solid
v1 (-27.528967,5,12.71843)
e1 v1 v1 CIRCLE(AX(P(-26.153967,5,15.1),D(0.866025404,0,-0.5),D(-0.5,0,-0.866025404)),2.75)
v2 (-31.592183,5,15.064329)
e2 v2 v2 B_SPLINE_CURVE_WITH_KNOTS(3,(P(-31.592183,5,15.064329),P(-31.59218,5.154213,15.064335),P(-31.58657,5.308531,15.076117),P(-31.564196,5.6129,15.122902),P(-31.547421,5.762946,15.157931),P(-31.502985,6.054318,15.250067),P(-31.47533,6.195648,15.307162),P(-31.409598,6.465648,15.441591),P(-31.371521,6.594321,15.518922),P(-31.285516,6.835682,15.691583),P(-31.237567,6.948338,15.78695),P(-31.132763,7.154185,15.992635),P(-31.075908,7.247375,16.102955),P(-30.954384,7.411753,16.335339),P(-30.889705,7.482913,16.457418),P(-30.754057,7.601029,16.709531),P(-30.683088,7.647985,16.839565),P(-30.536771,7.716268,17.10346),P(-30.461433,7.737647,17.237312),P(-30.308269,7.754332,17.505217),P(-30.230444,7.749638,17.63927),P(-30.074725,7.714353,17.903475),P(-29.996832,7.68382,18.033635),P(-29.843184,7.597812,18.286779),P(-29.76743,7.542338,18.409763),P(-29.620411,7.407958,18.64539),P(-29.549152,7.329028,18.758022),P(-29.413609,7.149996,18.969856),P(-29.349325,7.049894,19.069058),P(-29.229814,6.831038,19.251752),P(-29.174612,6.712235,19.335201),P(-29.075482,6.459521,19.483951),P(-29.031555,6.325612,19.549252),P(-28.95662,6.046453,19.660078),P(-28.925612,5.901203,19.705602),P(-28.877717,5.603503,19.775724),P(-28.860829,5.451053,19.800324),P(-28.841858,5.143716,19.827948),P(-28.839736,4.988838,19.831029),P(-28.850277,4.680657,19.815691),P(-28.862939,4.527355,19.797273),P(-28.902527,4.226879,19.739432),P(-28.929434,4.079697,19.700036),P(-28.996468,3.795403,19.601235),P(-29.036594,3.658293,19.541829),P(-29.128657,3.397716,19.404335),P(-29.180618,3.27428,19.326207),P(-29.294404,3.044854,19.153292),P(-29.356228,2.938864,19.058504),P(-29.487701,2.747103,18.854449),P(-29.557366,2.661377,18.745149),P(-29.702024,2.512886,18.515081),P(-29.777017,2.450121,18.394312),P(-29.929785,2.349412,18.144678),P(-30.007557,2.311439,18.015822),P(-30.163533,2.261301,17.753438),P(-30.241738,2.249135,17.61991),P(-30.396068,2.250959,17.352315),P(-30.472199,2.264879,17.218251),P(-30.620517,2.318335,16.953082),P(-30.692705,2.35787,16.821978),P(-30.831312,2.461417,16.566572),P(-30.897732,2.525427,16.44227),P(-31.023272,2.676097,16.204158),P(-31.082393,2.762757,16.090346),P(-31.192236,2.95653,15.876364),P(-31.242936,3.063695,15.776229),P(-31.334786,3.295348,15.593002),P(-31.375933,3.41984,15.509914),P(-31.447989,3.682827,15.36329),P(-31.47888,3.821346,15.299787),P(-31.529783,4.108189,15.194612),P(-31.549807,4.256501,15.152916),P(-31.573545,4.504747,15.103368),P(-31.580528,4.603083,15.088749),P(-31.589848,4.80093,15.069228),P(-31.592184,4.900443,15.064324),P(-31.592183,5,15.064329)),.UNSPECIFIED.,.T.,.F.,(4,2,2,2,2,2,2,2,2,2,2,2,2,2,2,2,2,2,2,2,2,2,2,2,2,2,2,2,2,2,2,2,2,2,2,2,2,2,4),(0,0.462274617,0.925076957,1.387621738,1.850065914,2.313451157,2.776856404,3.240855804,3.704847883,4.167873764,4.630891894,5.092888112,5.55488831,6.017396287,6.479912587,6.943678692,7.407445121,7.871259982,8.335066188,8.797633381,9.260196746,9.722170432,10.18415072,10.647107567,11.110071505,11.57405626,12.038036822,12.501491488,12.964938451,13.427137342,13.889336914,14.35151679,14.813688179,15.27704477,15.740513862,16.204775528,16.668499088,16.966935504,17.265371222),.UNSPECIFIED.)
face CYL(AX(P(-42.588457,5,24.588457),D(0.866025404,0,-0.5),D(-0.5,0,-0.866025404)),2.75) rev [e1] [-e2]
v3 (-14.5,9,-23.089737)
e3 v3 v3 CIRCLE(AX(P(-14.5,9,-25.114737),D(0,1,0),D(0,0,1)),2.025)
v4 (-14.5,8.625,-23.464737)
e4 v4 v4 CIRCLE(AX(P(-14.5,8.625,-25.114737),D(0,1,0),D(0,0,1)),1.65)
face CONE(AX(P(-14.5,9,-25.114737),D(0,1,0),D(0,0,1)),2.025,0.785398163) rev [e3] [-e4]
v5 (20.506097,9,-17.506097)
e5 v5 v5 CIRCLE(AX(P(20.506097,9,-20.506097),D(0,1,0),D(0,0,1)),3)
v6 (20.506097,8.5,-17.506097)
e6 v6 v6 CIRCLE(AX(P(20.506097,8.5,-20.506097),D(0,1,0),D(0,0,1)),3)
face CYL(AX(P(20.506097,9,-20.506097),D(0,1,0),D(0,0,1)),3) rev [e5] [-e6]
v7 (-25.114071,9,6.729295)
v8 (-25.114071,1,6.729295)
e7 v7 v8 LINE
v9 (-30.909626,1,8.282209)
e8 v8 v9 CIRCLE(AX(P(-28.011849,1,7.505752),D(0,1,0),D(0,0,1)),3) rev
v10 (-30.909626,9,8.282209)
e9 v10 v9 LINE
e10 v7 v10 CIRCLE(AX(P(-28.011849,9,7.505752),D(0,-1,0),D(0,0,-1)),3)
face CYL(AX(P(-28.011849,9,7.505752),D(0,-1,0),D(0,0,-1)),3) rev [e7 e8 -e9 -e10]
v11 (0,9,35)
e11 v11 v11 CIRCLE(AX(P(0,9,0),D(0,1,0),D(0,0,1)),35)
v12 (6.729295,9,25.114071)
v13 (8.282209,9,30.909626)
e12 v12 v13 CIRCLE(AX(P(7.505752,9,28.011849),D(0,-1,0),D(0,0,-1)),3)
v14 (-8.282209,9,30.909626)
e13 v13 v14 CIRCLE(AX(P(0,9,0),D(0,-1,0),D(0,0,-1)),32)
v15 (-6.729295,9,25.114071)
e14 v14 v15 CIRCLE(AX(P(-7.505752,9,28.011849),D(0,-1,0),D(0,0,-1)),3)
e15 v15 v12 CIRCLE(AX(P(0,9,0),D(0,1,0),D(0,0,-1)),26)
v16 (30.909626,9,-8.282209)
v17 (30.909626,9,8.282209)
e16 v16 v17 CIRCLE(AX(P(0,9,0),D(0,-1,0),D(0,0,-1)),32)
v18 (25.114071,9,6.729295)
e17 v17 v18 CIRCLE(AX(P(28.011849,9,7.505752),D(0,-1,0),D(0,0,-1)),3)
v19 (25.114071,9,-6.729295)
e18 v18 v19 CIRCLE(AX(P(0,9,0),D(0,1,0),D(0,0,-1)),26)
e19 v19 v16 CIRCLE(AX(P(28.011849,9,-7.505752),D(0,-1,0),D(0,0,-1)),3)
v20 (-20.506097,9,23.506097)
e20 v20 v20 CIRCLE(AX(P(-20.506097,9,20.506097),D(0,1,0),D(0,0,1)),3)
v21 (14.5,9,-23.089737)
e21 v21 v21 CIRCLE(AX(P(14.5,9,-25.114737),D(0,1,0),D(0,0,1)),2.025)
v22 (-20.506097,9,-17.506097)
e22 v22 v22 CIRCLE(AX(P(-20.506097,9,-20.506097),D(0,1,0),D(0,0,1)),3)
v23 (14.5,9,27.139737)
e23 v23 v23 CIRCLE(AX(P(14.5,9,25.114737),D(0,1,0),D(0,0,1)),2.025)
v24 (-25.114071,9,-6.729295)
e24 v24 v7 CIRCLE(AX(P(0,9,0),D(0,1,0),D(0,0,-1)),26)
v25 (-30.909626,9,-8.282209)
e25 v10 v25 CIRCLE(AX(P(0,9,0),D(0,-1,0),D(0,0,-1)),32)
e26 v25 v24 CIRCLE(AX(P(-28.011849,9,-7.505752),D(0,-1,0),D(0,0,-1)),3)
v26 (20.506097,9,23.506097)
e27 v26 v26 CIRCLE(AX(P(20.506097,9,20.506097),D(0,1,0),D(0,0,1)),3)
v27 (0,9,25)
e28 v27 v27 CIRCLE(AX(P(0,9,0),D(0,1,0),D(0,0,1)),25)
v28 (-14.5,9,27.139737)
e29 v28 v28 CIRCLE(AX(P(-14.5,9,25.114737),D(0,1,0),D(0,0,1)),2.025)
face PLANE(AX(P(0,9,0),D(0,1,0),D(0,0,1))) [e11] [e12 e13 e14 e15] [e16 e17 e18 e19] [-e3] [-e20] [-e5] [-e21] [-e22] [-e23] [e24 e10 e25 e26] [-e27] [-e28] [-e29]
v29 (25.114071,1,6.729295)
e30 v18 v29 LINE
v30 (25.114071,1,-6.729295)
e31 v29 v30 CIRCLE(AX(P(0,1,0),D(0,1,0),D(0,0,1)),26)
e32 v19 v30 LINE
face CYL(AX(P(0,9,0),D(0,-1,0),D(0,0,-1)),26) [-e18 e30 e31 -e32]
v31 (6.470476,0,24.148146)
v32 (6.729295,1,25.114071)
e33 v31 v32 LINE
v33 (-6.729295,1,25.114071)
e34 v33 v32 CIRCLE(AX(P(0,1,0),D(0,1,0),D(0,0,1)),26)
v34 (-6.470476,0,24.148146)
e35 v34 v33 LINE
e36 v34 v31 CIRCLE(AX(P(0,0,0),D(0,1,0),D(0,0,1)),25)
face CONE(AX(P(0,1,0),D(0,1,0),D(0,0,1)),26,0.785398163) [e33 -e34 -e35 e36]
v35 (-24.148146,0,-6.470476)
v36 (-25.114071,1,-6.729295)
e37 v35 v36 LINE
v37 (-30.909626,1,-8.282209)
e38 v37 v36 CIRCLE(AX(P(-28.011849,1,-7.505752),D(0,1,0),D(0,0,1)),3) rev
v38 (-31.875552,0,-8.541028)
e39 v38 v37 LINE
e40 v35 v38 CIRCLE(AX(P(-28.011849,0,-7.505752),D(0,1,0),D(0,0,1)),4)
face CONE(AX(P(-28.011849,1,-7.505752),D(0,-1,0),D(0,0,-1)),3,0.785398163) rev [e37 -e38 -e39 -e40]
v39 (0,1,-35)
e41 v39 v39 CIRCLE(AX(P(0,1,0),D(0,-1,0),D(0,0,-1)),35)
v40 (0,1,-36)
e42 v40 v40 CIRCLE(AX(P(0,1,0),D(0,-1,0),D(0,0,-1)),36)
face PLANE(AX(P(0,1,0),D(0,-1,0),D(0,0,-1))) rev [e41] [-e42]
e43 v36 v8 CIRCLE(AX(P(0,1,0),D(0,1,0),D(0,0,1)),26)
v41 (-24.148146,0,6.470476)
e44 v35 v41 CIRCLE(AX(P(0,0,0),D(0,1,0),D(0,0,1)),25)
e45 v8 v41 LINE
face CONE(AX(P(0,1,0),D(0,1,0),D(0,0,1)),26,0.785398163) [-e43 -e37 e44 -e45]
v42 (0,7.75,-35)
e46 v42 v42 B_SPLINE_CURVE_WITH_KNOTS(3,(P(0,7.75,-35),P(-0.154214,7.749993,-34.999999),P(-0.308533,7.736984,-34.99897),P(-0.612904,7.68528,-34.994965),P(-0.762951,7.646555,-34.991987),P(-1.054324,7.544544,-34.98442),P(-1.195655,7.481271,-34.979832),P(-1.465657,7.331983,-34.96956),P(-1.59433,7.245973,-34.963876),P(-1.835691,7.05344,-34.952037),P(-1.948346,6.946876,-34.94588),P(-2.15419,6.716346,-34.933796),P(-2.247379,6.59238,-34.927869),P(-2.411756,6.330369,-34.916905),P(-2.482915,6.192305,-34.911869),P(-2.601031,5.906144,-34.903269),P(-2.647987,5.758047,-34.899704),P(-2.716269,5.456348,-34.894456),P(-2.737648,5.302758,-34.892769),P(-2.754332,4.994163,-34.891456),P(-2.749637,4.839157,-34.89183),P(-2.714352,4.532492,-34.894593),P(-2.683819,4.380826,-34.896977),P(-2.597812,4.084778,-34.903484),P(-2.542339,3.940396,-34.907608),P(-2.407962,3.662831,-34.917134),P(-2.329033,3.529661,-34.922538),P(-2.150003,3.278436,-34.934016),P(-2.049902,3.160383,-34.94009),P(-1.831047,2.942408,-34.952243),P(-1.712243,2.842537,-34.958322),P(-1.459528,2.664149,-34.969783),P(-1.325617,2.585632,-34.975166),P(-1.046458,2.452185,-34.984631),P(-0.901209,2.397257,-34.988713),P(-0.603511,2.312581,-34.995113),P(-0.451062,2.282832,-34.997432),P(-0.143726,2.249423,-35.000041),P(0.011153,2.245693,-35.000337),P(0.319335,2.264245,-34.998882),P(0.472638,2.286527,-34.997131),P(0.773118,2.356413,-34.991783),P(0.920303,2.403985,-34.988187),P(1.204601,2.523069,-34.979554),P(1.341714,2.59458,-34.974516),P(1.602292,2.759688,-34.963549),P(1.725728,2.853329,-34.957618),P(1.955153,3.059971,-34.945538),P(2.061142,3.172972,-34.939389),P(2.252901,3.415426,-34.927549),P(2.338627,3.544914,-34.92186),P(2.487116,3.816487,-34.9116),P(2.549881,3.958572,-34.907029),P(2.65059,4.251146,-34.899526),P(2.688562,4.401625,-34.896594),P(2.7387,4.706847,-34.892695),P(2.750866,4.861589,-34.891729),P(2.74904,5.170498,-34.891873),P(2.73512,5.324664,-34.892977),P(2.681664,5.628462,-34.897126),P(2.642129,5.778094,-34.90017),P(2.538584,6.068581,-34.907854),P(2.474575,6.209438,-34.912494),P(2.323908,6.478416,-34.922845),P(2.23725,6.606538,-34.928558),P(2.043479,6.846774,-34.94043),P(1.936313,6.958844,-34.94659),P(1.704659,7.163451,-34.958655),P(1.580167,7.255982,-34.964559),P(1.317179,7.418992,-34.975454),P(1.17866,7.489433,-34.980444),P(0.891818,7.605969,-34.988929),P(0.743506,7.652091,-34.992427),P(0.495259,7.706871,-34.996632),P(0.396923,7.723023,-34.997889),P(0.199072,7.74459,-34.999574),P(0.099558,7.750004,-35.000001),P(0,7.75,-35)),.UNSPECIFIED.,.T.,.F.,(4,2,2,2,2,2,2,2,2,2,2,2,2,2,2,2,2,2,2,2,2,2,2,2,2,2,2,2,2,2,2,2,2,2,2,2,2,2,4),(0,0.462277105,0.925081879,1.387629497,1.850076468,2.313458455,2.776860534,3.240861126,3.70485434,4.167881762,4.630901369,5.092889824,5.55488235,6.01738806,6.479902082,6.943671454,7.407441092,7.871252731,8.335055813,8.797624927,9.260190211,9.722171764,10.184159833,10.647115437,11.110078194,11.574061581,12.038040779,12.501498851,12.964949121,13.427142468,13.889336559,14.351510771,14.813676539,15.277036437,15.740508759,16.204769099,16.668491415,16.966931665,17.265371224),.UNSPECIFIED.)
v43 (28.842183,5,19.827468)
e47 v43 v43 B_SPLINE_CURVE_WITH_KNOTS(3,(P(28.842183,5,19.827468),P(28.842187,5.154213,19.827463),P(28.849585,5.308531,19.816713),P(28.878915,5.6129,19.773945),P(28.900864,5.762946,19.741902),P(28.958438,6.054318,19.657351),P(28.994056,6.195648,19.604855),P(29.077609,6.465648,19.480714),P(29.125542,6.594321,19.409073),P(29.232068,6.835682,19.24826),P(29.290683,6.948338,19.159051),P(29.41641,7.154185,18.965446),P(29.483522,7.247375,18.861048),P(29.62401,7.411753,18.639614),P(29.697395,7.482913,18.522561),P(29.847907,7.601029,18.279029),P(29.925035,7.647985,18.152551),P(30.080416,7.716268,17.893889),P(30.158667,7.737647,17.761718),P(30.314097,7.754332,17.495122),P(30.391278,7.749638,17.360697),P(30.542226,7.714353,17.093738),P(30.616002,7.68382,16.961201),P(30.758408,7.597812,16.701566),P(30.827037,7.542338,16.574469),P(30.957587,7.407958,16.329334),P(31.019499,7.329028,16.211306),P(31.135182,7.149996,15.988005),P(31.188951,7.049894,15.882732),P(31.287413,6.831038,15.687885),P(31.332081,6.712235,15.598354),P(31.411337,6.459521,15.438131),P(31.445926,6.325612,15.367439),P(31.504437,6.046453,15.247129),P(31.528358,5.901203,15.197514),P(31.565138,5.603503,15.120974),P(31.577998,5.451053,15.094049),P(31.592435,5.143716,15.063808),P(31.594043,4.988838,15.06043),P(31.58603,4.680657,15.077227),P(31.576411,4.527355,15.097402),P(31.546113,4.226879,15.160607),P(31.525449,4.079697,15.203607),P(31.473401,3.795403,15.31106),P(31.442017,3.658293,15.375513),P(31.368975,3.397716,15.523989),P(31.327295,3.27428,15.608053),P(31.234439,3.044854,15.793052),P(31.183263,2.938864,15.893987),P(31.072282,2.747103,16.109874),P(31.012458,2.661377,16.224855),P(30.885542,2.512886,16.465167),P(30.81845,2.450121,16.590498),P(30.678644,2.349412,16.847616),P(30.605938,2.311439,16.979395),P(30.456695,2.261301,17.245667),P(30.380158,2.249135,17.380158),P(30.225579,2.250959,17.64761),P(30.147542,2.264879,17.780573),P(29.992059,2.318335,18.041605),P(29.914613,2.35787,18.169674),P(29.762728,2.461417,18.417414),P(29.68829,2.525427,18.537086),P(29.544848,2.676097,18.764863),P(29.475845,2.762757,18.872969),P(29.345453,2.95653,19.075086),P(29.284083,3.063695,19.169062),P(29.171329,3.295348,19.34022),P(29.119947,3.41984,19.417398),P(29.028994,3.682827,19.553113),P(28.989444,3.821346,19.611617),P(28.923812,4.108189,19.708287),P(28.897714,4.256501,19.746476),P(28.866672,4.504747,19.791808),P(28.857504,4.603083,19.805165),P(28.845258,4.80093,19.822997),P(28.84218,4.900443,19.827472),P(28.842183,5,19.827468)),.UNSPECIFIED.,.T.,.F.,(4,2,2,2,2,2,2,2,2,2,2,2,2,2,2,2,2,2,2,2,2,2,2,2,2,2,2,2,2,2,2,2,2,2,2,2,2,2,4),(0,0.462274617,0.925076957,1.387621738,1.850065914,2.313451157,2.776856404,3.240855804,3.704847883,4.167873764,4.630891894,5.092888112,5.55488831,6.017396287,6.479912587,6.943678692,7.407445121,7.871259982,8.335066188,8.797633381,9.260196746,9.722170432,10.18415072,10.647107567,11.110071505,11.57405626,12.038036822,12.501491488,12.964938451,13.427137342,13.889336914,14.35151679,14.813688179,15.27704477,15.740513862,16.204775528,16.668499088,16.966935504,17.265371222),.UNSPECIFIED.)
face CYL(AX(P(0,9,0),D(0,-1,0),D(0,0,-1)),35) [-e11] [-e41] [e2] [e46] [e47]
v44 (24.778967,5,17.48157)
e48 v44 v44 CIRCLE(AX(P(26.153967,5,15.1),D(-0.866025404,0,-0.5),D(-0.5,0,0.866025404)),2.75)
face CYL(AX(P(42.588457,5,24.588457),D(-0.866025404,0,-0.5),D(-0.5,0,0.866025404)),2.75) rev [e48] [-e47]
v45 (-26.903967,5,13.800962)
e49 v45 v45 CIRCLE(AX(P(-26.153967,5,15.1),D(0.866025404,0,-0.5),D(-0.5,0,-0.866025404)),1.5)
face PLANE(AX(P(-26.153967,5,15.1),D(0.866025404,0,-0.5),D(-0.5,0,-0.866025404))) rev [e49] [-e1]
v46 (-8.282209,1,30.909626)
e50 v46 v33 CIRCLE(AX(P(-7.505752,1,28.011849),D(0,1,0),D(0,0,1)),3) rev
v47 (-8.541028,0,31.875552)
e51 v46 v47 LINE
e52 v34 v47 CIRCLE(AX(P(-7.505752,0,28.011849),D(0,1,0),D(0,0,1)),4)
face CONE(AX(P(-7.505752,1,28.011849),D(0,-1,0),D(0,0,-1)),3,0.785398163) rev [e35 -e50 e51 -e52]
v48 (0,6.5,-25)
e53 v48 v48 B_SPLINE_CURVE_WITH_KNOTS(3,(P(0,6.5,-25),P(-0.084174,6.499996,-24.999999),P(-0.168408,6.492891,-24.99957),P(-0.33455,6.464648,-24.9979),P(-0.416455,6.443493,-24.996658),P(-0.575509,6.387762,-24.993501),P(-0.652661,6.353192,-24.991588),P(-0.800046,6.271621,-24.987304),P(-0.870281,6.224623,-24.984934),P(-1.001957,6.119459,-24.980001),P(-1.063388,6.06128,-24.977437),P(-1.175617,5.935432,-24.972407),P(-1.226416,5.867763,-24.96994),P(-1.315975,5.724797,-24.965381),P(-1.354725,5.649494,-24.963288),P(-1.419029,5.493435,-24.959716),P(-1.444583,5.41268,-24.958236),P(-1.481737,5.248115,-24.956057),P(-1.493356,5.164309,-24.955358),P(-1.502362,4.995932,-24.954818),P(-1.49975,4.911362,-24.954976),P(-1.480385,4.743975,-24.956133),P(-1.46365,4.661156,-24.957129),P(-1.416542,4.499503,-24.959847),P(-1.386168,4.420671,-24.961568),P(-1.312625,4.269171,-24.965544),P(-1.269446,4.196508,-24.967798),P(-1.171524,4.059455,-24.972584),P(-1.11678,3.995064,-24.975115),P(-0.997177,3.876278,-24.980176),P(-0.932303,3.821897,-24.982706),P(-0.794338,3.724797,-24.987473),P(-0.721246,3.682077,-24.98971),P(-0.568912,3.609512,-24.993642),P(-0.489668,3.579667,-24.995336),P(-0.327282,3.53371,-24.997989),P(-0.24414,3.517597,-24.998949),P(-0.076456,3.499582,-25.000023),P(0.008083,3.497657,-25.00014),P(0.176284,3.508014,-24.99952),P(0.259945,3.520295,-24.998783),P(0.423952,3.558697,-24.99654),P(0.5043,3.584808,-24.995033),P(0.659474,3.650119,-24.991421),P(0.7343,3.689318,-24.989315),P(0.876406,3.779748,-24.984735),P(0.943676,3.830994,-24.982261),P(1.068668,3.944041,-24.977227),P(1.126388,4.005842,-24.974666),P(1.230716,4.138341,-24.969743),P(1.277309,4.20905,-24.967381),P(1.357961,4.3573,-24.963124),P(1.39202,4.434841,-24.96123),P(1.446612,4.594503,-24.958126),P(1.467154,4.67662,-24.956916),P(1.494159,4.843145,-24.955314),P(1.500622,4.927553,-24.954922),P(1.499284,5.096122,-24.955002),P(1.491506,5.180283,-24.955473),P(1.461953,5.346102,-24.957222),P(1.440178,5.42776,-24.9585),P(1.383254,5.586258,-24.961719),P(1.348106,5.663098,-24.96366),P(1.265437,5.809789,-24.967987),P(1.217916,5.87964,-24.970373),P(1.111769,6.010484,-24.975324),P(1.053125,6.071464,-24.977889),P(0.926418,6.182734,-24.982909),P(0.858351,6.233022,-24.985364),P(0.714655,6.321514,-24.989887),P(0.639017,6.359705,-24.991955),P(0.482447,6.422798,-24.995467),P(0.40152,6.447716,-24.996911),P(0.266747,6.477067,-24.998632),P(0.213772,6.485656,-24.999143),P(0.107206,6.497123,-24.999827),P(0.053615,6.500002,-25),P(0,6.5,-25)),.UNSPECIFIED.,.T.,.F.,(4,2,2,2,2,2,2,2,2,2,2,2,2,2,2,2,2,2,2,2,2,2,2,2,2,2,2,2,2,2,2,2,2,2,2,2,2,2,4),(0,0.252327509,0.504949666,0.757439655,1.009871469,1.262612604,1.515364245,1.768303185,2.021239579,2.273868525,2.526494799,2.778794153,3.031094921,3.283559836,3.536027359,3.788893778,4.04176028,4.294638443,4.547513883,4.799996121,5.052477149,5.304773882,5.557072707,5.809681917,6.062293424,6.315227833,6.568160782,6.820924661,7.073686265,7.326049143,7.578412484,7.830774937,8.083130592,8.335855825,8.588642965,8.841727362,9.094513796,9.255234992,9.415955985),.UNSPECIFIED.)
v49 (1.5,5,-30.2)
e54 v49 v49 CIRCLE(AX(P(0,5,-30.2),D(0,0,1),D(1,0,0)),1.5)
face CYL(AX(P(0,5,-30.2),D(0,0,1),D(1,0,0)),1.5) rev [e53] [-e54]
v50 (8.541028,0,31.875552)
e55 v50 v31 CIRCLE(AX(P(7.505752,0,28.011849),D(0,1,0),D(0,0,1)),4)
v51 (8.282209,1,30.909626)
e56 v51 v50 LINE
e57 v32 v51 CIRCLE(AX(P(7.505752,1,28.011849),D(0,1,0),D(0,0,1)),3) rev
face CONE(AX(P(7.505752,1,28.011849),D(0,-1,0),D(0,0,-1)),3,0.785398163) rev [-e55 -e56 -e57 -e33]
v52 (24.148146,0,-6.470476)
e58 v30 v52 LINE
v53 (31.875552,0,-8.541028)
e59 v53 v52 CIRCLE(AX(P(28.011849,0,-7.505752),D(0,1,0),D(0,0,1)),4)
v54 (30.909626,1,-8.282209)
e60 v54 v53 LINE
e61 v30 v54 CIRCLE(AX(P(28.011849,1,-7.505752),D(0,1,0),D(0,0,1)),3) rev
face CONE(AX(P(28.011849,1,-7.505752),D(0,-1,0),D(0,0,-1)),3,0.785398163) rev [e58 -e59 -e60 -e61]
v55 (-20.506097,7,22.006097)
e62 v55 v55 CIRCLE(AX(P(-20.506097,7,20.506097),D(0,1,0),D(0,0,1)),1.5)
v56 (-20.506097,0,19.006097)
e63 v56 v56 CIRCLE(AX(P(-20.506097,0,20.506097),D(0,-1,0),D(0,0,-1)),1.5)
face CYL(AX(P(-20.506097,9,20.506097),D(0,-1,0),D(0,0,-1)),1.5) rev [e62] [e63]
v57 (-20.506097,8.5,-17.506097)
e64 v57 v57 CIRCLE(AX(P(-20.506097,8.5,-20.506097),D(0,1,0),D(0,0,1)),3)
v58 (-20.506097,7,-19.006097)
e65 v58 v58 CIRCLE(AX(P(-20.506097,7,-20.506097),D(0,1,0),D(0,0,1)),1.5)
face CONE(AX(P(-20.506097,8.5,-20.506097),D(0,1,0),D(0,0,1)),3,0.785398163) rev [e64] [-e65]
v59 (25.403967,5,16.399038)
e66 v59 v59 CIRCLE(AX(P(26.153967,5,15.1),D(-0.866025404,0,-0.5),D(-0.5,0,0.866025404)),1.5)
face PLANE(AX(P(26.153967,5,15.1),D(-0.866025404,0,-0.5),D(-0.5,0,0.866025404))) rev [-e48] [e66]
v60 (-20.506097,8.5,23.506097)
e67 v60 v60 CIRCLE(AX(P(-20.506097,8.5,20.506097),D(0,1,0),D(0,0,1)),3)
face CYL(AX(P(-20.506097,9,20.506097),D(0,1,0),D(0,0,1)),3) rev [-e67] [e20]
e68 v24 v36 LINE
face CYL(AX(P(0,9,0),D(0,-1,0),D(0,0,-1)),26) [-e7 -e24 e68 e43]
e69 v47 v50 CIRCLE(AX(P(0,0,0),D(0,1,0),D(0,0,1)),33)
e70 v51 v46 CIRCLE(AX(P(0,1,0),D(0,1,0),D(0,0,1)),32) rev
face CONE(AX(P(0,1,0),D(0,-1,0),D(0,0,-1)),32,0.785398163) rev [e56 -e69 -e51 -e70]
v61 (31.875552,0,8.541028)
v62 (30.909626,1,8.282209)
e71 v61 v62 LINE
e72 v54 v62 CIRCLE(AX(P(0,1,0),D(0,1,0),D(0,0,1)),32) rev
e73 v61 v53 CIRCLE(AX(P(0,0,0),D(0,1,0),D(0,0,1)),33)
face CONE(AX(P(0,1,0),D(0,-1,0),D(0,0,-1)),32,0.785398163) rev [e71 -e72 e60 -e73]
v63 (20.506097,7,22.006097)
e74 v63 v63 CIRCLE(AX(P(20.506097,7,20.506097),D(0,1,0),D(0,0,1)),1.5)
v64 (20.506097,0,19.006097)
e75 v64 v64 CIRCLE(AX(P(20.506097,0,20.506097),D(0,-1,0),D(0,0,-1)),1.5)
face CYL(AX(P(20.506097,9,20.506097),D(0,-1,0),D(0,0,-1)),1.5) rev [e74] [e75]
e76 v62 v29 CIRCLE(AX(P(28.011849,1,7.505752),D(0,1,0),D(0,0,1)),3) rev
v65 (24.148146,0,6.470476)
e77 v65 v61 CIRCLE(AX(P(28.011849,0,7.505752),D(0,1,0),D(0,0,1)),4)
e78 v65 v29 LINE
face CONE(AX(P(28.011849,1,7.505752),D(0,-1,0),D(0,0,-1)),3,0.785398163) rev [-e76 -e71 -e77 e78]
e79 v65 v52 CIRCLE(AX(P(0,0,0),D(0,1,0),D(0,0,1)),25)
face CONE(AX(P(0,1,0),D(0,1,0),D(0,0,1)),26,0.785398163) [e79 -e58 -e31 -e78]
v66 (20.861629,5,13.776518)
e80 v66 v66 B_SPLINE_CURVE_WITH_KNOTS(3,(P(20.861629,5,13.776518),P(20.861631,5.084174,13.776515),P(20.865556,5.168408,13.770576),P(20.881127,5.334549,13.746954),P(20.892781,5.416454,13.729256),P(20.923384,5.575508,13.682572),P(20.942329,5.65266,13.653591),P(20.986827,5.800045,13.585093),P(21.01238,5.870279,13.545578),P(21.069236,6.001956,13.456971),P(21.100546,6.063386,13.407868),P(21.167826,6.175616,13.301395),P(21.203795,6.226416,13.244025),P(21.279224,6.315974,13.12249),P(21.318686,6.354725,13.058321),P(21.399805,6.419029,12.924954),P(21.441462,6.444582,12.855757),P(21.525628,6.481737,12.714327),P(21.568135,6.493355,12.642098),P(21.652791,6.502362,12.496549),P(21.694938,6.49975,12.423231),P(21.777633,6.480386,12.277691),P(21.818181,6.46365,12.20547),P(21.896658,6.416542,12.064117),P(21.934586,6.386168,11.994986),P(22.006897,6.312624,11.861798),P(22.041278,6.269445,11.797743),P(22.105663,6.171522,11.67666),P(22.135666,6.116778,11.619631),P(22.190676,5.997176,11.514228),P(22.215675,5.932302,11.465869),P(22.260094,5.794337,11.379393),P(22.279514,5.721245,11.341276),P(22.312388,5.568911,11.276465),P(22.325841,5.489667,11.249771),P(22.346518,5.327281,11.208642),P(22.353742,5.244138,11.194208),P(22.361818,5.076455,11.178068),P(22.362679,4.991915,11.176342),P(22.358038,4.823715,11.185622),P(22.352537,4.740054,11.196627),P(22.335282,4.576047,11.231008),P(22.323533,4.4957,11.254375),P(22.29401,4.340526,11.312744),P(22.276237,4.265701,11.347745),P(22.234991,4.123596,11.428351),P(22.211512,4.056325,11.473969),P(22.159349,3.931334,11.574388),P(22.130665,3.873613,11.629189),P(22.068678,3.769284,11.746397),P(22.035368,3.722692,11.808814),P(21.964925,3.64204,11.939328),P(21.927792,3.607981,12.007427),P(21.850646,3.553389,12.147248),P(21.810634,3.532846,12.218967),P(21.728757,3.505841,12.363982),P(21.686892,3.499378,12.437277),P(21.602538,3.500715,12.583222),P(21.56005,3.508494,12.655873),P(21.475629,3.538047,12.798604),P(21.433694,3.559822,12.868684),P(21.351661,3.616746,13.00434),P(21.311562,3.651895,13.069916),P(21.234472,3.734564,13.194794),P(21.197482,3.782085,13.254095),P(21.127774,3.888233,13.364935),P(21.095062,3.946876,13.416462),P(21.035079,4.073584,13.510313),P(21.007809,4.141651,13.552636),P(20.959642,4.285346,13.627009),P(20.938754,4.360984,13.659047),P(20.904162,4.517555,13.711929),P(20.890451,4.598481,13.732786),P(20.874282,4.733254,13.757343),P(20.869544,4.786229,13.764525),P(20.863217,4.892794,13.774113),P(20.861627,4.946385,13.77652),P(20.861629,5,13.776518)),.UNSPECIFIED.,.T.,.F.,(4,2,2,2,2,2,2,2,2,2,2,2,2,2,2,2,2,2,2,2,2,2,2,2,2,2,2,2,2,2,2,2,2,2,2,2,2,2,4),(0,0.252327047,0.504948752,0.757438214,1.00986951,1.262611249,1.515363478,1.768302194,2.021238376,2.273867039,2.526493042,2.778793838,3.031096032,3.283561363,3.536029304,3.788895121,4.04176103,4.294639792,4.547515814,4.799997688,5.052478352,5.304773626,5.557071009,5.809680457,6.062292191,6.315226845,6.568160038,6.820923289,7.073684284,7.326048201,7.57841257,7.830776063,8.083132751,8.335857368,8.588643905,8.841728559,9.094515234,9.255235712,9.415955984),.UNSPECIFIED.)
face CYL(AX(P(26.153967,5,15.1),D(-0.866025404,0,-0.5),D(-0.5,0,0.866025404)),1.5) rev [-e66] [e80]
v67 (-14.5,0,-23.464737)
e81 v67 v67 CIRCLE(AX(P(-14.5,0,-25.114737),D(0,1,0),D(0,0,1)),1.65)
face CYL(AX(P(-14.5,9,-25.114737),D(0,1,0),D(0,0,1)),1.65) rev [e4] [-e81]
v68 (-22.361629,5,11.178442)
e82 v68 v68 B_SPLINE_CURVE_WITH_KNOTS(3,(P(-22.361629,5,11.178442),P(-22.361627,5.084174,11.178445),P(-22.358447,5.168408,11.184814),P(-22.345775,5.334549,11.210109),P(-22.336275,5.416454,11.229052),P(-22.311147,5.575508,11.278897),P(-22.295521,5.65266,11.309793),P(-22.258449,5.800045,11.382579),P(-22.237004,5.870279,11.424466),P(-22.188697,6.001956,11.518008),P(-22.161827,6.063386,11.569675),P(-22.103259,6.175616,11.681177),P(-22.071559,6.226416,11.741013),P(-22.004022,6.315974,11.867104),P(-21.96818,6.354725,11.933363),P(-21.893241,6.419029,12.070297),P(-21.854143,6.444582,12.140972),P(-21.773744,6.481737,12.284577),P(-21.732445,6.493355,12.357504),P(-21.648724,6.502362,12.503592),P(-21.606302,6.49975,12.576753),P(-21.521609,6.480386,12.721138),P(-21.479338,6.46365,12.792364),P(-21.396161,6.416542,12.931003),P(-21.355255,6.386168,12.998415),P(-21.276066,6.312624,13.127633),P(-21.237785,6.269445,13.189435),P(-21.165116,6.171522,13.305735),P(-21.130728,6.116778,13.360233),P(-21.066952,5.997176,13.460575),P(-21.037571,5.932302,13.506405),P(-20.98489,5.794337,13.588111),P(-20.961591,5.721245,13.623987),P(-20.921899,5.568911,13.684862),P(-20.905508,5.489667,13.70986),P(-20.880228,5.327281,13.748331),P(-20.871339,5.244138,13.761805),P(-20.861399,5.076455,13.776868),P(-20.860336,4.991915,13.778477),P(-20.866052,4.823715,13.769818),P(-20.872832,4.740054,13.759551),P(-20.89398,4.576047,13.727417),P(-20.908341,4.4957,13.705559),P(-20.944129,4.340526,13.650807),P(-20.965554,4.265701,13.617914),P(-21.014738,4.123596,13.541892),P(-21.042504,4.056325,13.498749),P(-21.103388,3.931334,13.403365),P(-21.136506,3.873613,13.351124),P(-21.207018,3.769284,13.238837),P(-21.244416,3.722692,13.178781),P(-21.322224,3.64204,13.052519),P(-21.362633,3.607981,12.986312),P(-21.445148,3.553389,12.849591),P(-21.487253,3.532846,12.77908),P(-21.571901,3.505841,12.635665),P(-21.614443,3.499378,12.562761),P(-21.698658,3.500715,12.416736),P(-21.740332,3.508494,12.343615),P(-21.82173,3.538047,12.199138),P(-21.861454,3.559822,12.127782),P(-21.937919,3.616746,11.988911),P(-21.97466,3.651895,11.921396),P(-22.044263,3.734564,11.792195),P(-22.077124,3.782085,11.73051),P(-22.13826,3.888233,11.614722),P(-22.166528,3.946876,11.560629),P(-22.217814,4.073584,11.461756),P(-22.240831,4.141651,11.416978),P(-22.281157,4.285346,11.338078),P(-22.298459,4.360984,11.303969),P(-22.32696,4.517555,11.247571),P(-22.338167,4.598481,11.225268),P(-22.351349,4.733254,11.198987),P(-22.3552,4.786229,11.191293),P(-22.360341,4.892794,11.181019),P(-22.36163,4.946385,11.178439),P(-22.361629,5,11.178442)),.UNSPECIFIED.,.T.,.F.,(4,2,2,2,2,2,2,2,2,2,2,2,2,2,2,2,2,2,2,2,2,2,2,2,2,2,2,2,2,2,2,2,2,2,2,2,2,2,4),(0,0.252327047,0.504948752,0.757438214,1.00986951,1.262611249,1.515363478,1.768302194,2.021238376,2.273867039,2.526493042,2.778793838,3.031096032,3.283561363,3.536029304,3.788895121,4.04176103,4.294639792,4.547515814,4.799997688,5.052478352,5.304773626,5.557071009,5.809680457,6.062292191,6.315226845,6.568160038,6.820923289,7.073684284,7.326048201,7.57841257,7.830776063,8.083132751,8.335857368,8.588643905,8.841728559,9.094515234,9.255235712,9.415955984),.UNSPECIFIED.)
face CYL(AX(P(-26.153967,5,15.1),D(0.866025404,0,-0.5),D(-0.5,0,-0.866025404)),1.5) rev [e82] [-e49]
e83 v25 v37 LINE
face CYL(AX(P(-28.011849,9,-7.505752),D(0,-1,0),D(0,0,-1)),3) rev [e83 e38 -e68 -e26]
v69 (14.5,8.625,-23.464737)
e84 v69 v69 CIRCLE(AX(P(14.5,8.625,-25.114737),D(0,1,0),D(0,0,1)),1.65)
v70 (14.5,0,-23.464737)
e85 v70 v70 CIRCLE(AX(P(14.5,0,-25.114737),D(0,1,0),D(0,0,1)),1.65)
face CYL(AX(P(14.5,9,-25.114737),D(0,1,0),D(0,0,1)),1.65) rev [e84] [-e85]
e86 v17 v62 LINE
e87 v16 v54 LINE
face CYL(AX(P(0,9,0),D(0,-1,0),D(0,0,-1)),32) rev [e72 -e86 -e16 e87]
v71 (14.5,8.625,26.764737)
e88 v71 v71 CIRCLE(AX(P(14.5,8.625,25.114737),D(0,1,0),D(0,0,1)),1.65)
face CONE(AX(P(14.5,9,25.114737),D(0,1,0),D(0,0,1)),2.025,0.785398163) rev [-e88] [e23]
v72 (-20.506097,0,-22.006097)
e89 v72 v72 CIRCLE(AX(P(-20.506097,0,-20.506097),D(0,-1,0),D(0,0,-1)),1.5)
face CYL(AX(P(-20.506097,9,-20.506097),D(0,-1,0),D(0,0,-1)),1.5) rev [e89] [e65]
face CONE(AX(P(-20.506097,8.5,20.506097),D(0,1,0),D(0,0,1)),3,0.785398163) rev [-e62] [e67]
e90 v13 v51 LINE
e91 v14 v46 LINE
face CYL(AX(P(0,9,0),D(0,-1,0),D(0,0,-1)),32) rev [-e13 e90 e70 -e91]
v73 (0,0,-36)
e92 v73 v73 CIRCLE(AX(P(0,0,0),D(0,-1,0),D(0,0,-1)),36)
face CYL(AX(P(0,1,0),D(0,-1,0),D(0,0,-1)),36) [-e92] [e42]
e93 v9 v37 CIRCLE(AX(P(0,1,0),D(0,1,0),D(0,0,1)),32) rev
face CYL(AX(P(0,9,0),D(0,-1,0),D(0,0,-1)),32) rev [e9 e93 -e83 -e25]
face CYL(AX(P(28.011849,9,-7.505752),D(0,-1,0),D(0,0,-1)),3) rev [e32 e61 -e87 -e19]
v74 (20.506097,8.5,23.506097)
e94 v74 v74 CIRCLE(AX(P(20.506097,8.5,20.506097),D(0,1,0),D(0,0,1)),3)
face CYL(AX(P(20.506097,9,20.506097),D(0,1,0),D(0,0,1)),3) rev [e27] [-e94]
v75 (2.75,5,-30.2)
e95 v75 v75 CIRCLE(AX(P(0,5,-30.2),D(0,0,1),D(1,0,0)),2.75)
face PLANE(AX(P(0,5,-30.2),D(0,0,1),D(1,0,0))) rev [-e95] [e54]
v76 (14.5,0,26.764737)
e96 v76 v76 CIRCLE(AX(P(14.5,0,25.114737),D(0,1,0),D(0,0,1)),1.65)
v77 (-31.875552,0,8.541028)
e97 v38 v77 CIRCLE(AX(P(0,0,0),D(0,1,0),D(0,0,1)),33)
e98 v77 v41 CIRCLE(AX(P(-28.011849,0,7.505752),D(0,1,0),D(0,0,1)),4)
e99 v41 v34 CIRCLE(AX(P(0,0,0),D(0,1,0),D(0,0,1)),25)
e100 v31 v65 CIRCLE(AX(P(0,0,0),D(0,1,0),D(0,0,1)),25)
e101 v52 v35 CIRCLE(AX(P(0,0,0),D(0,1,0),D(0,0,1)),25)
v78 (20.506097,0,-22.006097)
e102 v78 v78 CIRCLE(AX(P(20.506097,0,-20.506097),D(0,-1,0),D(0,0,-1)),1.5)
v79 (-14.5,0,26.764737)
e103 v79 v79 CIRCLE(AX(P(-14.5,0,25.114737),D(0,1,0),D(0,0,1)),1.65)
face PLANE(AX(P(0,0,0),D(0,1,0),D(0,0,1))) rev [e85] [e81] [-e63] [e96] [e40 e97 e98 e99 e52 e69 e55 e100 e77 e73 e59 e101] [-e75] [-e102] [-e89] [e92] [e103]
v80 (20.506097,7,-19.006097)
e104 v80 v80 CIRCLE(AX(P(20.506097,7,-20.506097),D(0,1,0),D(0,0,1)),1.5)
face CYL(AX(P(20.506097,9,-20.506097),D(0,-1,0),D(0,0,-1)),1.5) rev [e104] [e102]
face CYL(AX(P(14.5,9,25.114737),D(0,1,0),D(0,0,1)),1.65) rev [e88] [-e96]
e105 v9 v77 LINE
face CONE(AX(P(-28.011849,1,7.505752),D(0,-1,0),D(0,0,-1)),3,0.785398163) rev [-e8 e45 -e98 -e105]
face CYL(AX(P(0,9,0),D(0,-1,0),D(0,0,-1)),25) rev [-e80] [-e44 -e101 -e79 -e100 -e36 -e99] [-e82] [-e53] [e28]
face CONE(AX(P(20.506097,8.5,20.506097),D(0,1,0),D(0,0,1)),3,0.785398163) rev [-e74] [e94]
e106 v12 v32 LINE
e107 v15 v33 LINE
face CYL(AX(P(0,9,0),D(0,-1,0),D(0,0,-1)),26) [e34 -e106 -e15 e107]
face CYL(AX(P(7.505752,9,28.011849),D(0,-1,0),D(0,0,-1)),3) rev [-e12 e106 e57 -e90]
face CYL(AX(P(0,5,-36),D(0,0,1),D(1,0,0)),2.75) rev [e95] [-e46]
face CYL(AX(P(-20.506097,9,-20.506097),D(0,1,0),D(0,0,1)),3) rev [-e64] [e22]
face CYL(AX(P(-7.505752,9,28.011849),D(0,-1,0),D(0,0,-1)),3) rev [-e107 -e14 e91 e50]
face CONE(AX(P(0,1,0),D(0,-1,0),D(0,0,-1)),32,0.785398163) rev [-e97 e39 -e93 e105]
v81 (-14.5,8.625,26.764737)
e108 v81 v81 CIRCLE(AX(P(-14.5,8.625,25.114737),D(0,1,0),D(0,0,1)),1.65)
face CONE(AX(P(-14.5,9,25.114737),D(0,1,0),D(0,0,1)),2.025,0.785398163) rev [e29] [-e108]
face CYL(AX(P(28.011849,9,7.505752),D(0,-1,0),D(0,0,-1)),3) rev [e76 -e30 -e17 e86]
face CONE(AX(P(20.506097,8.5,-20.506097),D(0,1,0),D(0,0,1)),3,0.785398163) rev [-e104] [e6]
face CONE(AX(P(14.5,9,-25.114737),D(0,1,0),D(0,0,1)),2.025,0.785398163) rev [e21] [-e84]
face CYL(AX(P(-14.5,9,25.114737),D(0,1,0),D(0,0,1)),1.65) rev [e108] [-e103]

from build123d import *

# Parameters (mm, degrees)
SKETCH_5_R                   = 35
SKETCH_5_R_2                 = 25
EXTRUDE_1_DEPTH              = 9
SKETCH_17_R                  = 36
SKETCH_17_R_2                = 35
EXTRUDE_2_DEPTH              = 1
SKETCH_2_R                   = 1.5
CUT_EXTRUDE_1_DEPTH          = 57.044625077
HOLE_WIZARD_M4_4_D           = 3.3
HOLE_WIZARD_M4_4_CSINK_D     = 4.05
HOLE_WIZARD_M4_4_CSINK_ANGLE = 90
HOLE_WIZARD_1_AT_2_COUNT     = 2
HOLE_WIZARD_1_AT_2_PITCH     = 41.012193309
HOLE_WIZARD_1_AT_3_COUNT     = 2
HOLE_WIZARD_1_AT_3_PITCH     = 58
HOLE_WIZARD_1_AT_4_COUNT     = 2
HOLE_WIZARD_1_AT_4_PITCH     = 41.012193309
SKETCH_18_R                  = 1.5
CUT_EXTRUDE_2_DEPTH          = 30.2
SKETCH_19_R                  = 2.75
CUT_EXTRUDE_3_DEPTH          = 76.890974442
PATTERN_CIRCULAR_1_COUNT     = 3
CHAMFER_1_SIZE               = 1


with BuildPart() as part:
    # 草图5 → 凸台-拉伸1 (new body)
    with BuildSketch(Plane(origin=(0, 0, 0), x_dir=(1, 0, 0), z_dir=(0, 1, 0))):
        with Locations(Location((0, 0, 0), (0, 0, 270))):
            Circle(SKETCH_5_R)
        with Locations(Location((0, 0, 0), (0, 0, 270))):
            Circle(SKETCH_5_R_2, mode=Mode.SUBTRACT)
    extrude(amount=EXTRUDE_1_DEPTH)

    # 草图17 → 凸台-拉伸2 (add)
    with BuildSketch(Plane.XZ):
        with Locations(Location((0, 0, 0), (0, 0, 270))):
            Circle(SKETCH_17_R)
        with Locations(Location((0, 0, 0), (0, 0, 270))):
            Circle(SKETCH_17_R_2, mode=Mode.SUBTRACT)
    extrude(amount=-EXTRUDE_2_DEPTH)

    # 草图2 → 切除-拉伸1 (cut, through all)
    with BuildSketch(Plane(origin=(0, 0, 6), x_dir=(-1, 0, 0), z_dir=(0, -1, 0))):
        with Locations(Location((20.506096654, 26.506096654, 0), (0, 0, 90))):
            Circle(SKETCH_2_R)
        with Locations(Location((20.506096654, -14.506096654, 0), (0, 0, 90))):
            Circle(SKETCH_2_R)
        with Locations(Location((-20.506096654, -14.506096654, 0), (0, 0, 90))):
            Circle(SKETCH_2_R)
        with Locations(Location((-20.506096654, 26.506096654, 0), (0, 0, 90))):
            Circle(SKETCH_2_R)
        with BuildLine():
            ThreePointArc((30.909626441, -2.282209443), (32, 6), (30.909626441, 14.282209443))
            ThreePointArc((30.909626441, 14.282209443), (27.235391827, 16.403529787), (25.114071484, 12.729295173))
            ThreePointArc((25.114071484, 12.729295173), (26, 6), (25.114071484, -0.729295173))
            ThreePointArc((25.114071484, -0.729295173), (27.235391827, -4.403529787), (30.909626441, -2.282209443))
        make_face()
        with BuildLine():
            ThreePointArc((-8.282209443, -24.909626441), (0, -26), (8.282209443, -24.909626441))
            ThreePointArc((8.282209443, -24.909626441), (10.403529787, -21.235391827), (6.729295173, -19.114071484))
            ThreePointArc((6.729295173, -19.114071484), (0, -20), (-6.729295173, -19.114071484))
            ThreePointArc((-6.729295173, -19.114071484), (-10.403529787, -21.235391827), (-8.282209443, -24.909626441))
        make_face()
        with BuildLine():
            ThreePointArc((-30.909626441, 14.282209443), (-32, 6), (-30.909626441, -2.282209443))
            ThreePointArc((-30.909626441, -2.282209443), (-27.235391827, -4.403529787), (-25.114071484, -0.729295173))
            ThreePointArc((-25.114071484, -0.729295173), (-26, 6), (-25.114071484, 12.729295173))
            ThreePointArc((-25.114071484, 12.729295173), (-27.235391827, 16.403529787), (-30.909626441, 14.282209443))
        make_face()
    extrude(amount=-CUT_EXTRUDE_1_DEPTH, mode=Mode.SUBTRACT)

    # M4 螺纹孔4 (through all)
    with Locations(Plane(origin=(0, 9, 0), x_dir=(1, 0, 0), z_dir=(0, 1, 0))):
        with Locations((-14.5, 25.11473671), (14.5, 25.11473671), (14.5, -25.11473671), (-14.5, -25.11473671), (-29, 0), (29, 0)):
            CounterSinkHole(HOLE_WIZARD_M4_4_D / 2, HOLE_WIZARD_M4_4_CSINK_D / 2, counter_sink_angle=HOLE_WIZARD_M4_4_CSINK_ANGLE)

    # 草图15 → 孔1 (revolve, cut)
    with BuildSketch(Plane(origin=(-20.506096654, 9, 20.506096654), x_dir=(0, 0, 1), z_dir=(1, 0, 0))):
        Polygon((0, 0), (0, 9), (1.5, 9), (1.5, 2), (3, 0.5), (3, 0), align=None)
    hole_wizard_1 = revolve(axis=Axis((-20.506096654, 15.130023899, 20.506096654), (0, -1, 0)), mode=Mode.SUBTRACT)

    # 孔1 at 2: 孔1 ×2
    with Locations(*[(i * HOLE_WIZARD_1_AT_2_PITCH, 0, 0) for i in range(1, HOLE_WIZARD_1_AT_2_COUNT)]):
        add(hole_wizard_1, mode=Mode.SUBTRACT)

    # 孔1 at 3: 孔1 ×2
    with Locations(*[Vector(0.7071067811865474, 0, -0.7071067811865477) * (i * HOLE_WIZARD_1_AT_3_PITCH) for i in range(1, HOLE_WIZARD_1_AT_3_COUNT)]):
        add(hole_wizard_1, mode=Mode.SUBTRACT)

    # 孔1 at 4: 孔1 ×2
    with Locations(*[(0, 0, -i * HOLE_WIZARD_1_AT_4_PITCH) for i in range(1, HOLE_WIZARD_1_AT_4_COUNT)]):
        add(hole_wizard_1, mode=Mode.SUBTRACT)

    # 草图18 → 切除-拉伸2 (cut)
    with BuildSketch(Plane.XY):
        with Locations((0, 5)):
            Circle(SKETCH_18_R)
    cut_extrude_2 = extrude(amount=-CUT_EXTRUDE_2_DEPTH, mode=Mode.SUBTRACT)

    # 草图19 → 切除-拉伸3 (cut, through all)
    with BuildSketch(Plane.XY.offset(-30.2)):
        with Locations((0, 5)):
            Circle(SKETCH_19_R)
    cut_extrude_3 = extrude(amount=-CUT_EXTRUDE_3_DEPTH, mode=Mode.SUBTRACT)

    # 阵列(圆周)1: 切除-拉伸2, 切除-拉伸3 ×3 about axis
    pattern_circular_1_axis = Axis((0, 0, 0), (0, 1, 0))
    add([cut_extrude_2.rotate(pattern_circular_1_axis, i * 360 / PATTERN_CIRCULAR_1_COUNT) for i in range(1, PATTERN_CIRCULAR_1_COUNT)], mode=Mode.SUBTRACT)
    add([cut_extrude_3.rotate(pattern_circular_1_axis, i * 360 / PATTERN_CIRCULAR_1_COUNT) for i in range(1, PATTERN_CIRCULAR_1_COUNT)], mode=Mode.SUBTRACT)

    # 倒角1
    chamfer_1_edges = [part.edges().sort_by_distance(p)[0] for p in [
        (-27.235391827, 0, 10.403529787),
        (-32, 0, 0),
        (-27.235391827, 0, -10.403529787),
        (-26, 0, 0),
        (10.403529787, 0, 27.235391827),
        (0, 0, 32),
        (-10.403529787, 0, 27.235391827),
        (0, 0, 26),
        (27.235391827, 0, -10.403529787),
        (32, 0, 0),
        (27.235391827, 0, 10.403529787),
        (26, 0, 0),
    ]]
    chamfer(chamfer_1_edges, length=CHAMFER_1_SIZE - 0.0001)  # a hair under: the kernel refuses the full size


solid = part.part
